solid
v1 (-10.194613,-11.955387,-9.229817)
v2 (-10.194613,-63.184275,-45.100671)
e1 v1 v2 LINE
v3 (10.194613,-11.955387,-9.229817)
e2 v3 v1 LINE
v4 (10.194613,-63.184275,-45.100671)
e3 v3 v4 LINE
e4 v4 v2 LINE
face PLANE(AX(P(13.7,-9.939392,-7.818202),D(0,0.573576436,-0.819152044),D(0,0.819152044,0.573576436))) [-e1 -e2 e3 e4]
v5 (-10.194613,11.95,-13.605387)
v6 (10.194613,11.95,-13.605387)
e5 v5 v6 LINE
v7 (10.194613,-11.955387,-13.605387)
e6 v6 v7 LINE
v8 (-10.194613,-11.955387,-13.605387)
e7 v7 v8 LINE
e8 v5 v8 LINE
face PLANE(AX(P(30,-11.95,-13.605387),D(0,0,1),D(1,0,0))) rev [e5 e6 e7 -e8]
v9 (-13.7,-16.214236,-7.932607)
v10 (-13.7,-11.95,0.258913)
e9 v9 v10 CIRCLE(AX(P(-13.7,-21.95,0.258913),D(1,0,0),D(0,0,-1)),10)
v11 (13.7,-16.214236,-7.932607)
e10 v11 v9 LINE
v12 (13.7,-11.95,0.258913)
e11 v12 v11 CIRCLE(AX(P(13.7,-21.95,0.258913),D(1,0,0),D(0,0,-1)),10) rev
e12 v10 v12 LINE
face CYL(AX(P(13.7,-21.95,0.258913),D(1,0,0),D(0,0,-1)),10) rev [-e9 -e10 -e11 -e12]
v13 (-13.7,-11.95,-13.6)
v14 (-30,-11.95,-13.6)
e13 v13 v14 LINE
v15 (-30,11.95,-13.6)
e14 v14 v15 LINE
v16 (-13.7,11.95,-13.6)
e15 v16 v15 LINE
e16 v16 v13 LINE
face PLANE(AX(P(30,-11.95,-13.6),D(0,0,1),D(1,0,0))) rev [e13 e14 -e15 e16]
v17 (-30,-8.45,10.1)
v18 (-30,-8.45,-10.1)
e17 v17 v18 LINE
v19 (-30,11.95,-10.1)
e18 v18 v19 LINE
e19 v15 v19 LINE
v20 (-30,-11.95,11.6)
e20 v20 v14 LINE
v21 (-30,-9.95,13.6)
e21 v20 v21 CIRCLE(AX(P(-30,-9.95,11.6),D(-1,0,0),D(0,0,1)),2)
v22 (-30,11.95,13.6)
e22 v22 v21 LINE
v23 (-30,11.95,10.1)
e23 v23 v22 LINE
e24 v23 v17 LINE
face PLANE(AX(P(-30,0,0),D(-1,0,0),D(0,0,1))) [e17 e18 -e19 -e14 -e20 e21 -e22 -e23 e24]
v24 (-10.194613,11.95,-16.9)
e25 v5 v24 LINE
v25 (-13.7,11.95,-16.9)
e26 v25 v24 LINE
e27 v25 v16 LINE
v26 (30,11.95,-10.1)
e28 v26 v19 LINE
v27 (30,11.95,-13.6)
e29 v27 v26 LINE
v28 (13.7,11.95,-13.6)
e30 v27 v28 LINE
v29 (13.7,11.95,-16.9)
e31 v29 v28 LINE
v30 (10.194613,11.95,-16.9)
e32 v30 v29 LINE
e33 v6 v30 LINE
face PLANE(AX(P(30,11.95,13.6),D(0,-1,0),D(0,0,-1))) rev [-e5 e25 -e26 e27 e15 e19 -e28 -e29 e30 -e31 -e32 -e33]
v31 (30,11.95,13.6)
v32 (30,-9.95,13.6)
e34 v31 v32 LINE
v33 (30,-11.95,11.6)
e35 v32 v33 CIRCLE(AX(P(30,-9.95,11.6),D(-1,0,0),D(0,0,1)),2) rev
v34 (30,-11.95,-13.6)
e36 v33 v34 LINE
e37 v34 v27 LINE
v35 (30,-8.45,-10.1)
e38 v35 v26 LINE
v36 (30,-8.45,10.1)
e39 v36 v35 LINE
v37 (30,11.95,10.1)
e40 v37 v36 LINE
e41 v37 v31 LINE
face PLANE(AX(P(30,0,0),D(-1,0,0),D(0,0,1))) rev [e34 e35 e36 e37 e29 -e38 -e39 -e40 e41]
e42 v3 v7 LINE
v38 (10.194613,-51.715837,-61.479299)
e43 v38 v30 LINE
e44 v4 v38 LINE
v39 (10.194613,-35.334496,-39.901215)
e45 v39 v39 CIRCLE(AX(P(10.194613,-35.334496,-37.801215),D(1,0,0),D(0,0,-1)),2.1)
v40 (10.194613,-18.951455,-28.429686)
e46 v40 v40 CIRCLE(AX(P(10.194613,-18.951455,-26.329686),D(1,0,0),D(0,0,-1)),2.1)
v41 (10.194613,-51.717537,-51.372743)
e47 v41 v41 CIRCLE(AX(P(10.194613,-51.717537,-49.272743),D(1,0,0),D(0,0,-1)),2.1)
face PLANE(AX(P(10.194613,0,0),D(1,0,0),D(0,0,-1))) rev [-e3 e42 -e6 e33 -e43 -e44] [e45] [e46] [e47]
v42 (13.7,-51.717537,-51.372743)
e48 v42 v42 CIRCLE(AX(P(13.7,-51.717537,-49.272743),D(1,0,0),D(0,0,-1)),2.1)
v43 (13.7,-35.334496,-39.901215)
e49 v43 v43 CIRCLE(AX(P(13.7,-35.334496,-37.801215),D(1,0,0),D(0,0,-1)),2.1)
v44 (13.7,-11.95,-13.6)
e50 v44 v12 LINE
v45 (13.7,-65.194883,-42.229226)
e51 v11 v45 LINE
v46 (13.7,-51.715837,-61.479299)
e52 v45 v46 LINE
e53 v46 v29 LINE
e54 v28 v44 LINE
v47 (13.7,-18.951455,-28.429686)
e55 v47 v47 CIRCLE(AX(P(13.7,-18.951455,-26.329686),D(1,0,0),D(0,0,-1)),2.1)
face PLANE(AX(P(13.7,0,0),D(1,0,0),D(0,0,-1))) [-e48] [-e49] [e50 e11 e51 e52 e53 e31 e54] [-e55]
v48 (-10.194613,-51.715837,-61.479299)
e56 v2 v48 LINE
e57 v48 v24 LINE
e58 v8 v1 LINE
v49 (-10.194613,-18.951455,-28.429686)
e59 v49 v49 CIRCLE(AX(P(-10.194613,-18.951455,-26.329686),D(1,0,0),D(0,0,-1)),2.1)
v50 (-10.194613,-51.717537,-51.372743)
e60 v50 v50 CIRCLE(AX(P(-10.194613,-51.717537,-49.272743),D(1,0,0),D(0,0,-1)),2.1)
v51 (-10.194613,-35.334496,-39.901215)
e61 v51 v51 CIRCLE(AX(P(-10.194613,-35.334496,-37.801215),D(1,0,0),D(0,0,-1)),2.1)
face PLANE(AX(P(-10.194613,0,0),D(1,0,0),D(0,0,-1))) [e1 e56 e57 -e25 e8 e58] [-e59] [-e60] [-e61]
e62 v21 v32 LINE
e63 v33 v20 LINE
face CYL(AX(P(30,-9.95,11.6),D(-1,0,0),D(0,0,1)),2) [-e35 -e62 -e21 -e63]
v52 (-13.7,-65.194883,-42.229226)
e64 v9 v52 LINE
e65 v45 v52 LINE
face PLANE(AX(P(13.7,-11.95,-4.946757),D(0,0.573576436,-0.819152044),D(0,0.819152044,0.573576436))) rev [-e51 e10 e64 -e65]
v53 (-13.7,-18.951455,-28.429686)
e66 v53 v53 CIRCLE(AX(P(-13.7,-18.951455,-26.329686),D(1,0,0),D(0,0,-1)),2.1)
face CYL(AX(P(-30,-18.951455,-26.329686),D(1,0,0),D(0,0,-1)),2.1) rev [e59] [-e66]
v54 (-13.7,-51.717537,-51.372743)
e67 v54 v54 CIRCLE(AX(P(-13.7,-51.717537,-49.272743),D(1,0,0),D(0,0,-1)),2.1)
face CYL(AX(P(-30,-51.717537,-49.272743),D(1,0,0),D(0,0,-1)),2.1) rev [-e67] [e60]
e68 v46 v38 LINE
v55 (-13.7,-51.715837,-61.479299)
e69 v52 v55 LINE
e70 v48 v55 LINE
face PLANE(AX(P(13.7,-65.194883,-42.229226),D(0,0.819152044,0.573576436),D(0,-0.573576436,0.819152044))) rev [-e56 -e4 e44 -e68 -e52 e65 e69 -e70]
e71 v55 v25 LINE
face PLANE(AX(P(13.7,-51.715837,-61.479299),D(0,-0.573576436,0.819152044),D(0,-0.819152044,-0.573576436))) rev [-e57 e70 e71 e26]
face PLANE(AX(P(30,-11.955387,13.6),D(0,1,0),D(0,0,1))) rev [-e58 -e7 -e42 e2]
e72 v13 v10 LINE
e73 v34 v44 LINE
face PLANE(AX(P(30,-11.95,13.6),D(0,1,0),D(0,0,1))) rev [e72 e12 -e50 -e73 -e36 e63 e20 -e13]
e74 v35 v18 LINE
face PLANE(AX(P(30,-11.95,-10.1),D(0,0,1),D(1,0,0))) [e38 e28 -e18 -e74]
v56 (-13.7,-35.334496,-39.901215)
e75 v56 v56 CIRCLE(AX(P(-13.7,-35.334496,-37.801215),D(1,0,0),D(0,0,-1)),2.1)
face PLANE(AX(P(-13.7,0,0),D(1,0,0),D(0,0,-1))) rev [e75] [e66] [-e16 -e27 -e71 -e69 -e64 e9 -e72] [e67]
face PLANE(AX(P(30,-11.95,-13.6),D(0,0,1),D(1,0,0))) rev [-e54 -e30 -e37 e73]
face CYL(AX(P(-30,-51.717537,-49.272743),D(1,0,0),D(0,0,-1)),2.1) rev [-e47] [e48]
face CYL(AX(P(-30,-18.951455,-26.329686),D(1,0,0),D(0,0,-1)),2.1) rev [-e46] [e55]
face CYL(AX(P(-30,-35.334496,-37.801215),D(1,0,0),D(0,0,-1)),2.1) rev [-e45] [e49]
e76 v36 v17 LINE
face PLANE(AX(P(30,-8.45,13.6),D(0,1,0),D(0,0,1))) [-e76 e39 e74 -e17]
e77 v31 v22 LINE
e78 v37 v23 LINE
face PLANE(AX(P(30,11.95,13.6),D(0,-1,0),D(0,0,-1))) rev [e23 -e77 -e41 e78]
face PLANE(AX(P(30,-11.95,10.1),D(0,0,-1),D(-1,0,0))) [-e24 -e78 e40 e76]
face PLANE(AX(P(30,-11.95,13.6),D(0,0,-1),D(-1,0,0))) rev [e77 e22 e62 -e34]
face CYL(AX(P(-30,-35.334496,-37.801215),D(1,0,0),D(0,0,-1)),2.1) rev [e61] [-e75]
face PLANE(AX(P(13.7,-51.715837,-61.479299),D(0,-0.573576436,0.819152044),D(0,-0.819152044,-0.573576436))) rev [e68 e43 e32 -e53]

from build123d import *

# Parameters (mm, degrees)
SKETCH1_W           = 27.2
SKETCH1_H           = 23.9
BOSS_EXTRUDE1_DEPTH = 30
SHELL1_T            = -3.5
BOSS_EXTRUDE2_DEPTH = 13.7
SHELL3_START        = -10.194612797
SHELL3_DEPTH        = 20.389225594
FILLET2_R           = 2
SKETCH3_R           = 2.1
CUT_EXTRUDE1_DEPTH  = 100.698379758
FILLET3_R           = 10
SKETCH4_W           = 27.4
SKETCH4_H           = 4.712888426
CUT_EXTRUDE2_DEPTH  = 89.262138497


# Read off the part's stored shape, not the designer's step: Shell3
with BuildPart() as part:
    # Sketch1 → Boss-Extrude1 (new, symmetric)
    with BuildSketch(Plane(origin=(0, 0, 0), x_dir=(0, 0, -1), z_dir=(1, 0, 0))):
        Rectangle(SKETCH1_W, SKETCH1_H)
    extrude(amount=BOSS_EXTRUDE1_DEPTH, both=True)

    # Shell1
    shell1_openings = [part.faces().sort_by_distance(p)[0] for p in [
        (30, 0, 0),
        (-30, 0, 0),
        (0, 11.95, 0),
    ]]
    offset(amount=SHELL1_T, openings=shell1_openings, kind=Kind.INTERSECTION)

    # Sketch2 → Boss-Extrude2 (add, symmetric)
    with BuildSketch(Plane(origin=(0, 0, 0), x_dir=(0, 0, -1), z_dir=(1, 0, 0))):
        Polygon((4.94675733, -11.95), (42.229225693, -65.194882879), (61.479298734, -51.715836625), (13.6, 16.662888426), (10.1, 16.662888426), (10.1, 11.95), (13.6, 11.95), (13.6, -11.95), align=None)
    extrude(amount=BOSS_EXTRUDE2_DEPTH, both=True)

    # Shell3 outline → Shell3 (cut)
    with BuildSketch(Plane.YZ.offset(SHELL3_START)):
        Polygon((13.157501223, -16.054498544), (13.157501223, -13.605387203), (-11.955387203, -13.605387203), (-11.955387203, -9.229817112), (-63.184275379, -45.100670786), (-51.715836625, -61.479298734), align=None)
    extrude(amount=SHELL3_DEPTH, mode=Mode.SUBTRACT)

    # Fillet2
    fillet2_edges = [part.edges().sort_by_distance(p)[0] for p in [
        (0, -11.95, 13.6),
    ]]
    fillet(fillet2_edges, radius=FILLET2_R)

    # Sketch3 → Cut-Extrude1 (cut, through all)
    with BuildSketch(Plane(origin=(13.7, 0, 0), x_dir=(0, 0, -1), z_dir=(1, 0, 0))):
        with Locations((49.272743236, -51.717536678)):
            Circle(SKETCH3_R)
        with Locations((37.801214509, -35.334495792)):
            Circle(SKETCH3_R)
        with Locations((26.329685782, -18.951454906)):
            Circle(SKETCH3_R)
    extrude(amount=-CUT_EXTRUDE1_DEPTH, mode=Mode.SUBTRACT)

    # Fillet3
    fillet3_edges = [part.edges().sort_by_distance(p)[0] for p in [
        (0, -11.95, -4.94675733),
    ]]
    fillet(fillet3_edges, radius=FILLET3_R)

    # Sketch4 → Cut-Extrude2 (cut, through all)
    with BuildSketch(Plane.XY.offset(-10.1)):
        with Locations((0, 14.306444213)):
            Rectangle(SKETCH4_W, SKETCH4_H)
    extrude(amount=-CUT_EXTRUDE2_DEPTH, mode=Mode.SUBTRACT)


solid = part.part
